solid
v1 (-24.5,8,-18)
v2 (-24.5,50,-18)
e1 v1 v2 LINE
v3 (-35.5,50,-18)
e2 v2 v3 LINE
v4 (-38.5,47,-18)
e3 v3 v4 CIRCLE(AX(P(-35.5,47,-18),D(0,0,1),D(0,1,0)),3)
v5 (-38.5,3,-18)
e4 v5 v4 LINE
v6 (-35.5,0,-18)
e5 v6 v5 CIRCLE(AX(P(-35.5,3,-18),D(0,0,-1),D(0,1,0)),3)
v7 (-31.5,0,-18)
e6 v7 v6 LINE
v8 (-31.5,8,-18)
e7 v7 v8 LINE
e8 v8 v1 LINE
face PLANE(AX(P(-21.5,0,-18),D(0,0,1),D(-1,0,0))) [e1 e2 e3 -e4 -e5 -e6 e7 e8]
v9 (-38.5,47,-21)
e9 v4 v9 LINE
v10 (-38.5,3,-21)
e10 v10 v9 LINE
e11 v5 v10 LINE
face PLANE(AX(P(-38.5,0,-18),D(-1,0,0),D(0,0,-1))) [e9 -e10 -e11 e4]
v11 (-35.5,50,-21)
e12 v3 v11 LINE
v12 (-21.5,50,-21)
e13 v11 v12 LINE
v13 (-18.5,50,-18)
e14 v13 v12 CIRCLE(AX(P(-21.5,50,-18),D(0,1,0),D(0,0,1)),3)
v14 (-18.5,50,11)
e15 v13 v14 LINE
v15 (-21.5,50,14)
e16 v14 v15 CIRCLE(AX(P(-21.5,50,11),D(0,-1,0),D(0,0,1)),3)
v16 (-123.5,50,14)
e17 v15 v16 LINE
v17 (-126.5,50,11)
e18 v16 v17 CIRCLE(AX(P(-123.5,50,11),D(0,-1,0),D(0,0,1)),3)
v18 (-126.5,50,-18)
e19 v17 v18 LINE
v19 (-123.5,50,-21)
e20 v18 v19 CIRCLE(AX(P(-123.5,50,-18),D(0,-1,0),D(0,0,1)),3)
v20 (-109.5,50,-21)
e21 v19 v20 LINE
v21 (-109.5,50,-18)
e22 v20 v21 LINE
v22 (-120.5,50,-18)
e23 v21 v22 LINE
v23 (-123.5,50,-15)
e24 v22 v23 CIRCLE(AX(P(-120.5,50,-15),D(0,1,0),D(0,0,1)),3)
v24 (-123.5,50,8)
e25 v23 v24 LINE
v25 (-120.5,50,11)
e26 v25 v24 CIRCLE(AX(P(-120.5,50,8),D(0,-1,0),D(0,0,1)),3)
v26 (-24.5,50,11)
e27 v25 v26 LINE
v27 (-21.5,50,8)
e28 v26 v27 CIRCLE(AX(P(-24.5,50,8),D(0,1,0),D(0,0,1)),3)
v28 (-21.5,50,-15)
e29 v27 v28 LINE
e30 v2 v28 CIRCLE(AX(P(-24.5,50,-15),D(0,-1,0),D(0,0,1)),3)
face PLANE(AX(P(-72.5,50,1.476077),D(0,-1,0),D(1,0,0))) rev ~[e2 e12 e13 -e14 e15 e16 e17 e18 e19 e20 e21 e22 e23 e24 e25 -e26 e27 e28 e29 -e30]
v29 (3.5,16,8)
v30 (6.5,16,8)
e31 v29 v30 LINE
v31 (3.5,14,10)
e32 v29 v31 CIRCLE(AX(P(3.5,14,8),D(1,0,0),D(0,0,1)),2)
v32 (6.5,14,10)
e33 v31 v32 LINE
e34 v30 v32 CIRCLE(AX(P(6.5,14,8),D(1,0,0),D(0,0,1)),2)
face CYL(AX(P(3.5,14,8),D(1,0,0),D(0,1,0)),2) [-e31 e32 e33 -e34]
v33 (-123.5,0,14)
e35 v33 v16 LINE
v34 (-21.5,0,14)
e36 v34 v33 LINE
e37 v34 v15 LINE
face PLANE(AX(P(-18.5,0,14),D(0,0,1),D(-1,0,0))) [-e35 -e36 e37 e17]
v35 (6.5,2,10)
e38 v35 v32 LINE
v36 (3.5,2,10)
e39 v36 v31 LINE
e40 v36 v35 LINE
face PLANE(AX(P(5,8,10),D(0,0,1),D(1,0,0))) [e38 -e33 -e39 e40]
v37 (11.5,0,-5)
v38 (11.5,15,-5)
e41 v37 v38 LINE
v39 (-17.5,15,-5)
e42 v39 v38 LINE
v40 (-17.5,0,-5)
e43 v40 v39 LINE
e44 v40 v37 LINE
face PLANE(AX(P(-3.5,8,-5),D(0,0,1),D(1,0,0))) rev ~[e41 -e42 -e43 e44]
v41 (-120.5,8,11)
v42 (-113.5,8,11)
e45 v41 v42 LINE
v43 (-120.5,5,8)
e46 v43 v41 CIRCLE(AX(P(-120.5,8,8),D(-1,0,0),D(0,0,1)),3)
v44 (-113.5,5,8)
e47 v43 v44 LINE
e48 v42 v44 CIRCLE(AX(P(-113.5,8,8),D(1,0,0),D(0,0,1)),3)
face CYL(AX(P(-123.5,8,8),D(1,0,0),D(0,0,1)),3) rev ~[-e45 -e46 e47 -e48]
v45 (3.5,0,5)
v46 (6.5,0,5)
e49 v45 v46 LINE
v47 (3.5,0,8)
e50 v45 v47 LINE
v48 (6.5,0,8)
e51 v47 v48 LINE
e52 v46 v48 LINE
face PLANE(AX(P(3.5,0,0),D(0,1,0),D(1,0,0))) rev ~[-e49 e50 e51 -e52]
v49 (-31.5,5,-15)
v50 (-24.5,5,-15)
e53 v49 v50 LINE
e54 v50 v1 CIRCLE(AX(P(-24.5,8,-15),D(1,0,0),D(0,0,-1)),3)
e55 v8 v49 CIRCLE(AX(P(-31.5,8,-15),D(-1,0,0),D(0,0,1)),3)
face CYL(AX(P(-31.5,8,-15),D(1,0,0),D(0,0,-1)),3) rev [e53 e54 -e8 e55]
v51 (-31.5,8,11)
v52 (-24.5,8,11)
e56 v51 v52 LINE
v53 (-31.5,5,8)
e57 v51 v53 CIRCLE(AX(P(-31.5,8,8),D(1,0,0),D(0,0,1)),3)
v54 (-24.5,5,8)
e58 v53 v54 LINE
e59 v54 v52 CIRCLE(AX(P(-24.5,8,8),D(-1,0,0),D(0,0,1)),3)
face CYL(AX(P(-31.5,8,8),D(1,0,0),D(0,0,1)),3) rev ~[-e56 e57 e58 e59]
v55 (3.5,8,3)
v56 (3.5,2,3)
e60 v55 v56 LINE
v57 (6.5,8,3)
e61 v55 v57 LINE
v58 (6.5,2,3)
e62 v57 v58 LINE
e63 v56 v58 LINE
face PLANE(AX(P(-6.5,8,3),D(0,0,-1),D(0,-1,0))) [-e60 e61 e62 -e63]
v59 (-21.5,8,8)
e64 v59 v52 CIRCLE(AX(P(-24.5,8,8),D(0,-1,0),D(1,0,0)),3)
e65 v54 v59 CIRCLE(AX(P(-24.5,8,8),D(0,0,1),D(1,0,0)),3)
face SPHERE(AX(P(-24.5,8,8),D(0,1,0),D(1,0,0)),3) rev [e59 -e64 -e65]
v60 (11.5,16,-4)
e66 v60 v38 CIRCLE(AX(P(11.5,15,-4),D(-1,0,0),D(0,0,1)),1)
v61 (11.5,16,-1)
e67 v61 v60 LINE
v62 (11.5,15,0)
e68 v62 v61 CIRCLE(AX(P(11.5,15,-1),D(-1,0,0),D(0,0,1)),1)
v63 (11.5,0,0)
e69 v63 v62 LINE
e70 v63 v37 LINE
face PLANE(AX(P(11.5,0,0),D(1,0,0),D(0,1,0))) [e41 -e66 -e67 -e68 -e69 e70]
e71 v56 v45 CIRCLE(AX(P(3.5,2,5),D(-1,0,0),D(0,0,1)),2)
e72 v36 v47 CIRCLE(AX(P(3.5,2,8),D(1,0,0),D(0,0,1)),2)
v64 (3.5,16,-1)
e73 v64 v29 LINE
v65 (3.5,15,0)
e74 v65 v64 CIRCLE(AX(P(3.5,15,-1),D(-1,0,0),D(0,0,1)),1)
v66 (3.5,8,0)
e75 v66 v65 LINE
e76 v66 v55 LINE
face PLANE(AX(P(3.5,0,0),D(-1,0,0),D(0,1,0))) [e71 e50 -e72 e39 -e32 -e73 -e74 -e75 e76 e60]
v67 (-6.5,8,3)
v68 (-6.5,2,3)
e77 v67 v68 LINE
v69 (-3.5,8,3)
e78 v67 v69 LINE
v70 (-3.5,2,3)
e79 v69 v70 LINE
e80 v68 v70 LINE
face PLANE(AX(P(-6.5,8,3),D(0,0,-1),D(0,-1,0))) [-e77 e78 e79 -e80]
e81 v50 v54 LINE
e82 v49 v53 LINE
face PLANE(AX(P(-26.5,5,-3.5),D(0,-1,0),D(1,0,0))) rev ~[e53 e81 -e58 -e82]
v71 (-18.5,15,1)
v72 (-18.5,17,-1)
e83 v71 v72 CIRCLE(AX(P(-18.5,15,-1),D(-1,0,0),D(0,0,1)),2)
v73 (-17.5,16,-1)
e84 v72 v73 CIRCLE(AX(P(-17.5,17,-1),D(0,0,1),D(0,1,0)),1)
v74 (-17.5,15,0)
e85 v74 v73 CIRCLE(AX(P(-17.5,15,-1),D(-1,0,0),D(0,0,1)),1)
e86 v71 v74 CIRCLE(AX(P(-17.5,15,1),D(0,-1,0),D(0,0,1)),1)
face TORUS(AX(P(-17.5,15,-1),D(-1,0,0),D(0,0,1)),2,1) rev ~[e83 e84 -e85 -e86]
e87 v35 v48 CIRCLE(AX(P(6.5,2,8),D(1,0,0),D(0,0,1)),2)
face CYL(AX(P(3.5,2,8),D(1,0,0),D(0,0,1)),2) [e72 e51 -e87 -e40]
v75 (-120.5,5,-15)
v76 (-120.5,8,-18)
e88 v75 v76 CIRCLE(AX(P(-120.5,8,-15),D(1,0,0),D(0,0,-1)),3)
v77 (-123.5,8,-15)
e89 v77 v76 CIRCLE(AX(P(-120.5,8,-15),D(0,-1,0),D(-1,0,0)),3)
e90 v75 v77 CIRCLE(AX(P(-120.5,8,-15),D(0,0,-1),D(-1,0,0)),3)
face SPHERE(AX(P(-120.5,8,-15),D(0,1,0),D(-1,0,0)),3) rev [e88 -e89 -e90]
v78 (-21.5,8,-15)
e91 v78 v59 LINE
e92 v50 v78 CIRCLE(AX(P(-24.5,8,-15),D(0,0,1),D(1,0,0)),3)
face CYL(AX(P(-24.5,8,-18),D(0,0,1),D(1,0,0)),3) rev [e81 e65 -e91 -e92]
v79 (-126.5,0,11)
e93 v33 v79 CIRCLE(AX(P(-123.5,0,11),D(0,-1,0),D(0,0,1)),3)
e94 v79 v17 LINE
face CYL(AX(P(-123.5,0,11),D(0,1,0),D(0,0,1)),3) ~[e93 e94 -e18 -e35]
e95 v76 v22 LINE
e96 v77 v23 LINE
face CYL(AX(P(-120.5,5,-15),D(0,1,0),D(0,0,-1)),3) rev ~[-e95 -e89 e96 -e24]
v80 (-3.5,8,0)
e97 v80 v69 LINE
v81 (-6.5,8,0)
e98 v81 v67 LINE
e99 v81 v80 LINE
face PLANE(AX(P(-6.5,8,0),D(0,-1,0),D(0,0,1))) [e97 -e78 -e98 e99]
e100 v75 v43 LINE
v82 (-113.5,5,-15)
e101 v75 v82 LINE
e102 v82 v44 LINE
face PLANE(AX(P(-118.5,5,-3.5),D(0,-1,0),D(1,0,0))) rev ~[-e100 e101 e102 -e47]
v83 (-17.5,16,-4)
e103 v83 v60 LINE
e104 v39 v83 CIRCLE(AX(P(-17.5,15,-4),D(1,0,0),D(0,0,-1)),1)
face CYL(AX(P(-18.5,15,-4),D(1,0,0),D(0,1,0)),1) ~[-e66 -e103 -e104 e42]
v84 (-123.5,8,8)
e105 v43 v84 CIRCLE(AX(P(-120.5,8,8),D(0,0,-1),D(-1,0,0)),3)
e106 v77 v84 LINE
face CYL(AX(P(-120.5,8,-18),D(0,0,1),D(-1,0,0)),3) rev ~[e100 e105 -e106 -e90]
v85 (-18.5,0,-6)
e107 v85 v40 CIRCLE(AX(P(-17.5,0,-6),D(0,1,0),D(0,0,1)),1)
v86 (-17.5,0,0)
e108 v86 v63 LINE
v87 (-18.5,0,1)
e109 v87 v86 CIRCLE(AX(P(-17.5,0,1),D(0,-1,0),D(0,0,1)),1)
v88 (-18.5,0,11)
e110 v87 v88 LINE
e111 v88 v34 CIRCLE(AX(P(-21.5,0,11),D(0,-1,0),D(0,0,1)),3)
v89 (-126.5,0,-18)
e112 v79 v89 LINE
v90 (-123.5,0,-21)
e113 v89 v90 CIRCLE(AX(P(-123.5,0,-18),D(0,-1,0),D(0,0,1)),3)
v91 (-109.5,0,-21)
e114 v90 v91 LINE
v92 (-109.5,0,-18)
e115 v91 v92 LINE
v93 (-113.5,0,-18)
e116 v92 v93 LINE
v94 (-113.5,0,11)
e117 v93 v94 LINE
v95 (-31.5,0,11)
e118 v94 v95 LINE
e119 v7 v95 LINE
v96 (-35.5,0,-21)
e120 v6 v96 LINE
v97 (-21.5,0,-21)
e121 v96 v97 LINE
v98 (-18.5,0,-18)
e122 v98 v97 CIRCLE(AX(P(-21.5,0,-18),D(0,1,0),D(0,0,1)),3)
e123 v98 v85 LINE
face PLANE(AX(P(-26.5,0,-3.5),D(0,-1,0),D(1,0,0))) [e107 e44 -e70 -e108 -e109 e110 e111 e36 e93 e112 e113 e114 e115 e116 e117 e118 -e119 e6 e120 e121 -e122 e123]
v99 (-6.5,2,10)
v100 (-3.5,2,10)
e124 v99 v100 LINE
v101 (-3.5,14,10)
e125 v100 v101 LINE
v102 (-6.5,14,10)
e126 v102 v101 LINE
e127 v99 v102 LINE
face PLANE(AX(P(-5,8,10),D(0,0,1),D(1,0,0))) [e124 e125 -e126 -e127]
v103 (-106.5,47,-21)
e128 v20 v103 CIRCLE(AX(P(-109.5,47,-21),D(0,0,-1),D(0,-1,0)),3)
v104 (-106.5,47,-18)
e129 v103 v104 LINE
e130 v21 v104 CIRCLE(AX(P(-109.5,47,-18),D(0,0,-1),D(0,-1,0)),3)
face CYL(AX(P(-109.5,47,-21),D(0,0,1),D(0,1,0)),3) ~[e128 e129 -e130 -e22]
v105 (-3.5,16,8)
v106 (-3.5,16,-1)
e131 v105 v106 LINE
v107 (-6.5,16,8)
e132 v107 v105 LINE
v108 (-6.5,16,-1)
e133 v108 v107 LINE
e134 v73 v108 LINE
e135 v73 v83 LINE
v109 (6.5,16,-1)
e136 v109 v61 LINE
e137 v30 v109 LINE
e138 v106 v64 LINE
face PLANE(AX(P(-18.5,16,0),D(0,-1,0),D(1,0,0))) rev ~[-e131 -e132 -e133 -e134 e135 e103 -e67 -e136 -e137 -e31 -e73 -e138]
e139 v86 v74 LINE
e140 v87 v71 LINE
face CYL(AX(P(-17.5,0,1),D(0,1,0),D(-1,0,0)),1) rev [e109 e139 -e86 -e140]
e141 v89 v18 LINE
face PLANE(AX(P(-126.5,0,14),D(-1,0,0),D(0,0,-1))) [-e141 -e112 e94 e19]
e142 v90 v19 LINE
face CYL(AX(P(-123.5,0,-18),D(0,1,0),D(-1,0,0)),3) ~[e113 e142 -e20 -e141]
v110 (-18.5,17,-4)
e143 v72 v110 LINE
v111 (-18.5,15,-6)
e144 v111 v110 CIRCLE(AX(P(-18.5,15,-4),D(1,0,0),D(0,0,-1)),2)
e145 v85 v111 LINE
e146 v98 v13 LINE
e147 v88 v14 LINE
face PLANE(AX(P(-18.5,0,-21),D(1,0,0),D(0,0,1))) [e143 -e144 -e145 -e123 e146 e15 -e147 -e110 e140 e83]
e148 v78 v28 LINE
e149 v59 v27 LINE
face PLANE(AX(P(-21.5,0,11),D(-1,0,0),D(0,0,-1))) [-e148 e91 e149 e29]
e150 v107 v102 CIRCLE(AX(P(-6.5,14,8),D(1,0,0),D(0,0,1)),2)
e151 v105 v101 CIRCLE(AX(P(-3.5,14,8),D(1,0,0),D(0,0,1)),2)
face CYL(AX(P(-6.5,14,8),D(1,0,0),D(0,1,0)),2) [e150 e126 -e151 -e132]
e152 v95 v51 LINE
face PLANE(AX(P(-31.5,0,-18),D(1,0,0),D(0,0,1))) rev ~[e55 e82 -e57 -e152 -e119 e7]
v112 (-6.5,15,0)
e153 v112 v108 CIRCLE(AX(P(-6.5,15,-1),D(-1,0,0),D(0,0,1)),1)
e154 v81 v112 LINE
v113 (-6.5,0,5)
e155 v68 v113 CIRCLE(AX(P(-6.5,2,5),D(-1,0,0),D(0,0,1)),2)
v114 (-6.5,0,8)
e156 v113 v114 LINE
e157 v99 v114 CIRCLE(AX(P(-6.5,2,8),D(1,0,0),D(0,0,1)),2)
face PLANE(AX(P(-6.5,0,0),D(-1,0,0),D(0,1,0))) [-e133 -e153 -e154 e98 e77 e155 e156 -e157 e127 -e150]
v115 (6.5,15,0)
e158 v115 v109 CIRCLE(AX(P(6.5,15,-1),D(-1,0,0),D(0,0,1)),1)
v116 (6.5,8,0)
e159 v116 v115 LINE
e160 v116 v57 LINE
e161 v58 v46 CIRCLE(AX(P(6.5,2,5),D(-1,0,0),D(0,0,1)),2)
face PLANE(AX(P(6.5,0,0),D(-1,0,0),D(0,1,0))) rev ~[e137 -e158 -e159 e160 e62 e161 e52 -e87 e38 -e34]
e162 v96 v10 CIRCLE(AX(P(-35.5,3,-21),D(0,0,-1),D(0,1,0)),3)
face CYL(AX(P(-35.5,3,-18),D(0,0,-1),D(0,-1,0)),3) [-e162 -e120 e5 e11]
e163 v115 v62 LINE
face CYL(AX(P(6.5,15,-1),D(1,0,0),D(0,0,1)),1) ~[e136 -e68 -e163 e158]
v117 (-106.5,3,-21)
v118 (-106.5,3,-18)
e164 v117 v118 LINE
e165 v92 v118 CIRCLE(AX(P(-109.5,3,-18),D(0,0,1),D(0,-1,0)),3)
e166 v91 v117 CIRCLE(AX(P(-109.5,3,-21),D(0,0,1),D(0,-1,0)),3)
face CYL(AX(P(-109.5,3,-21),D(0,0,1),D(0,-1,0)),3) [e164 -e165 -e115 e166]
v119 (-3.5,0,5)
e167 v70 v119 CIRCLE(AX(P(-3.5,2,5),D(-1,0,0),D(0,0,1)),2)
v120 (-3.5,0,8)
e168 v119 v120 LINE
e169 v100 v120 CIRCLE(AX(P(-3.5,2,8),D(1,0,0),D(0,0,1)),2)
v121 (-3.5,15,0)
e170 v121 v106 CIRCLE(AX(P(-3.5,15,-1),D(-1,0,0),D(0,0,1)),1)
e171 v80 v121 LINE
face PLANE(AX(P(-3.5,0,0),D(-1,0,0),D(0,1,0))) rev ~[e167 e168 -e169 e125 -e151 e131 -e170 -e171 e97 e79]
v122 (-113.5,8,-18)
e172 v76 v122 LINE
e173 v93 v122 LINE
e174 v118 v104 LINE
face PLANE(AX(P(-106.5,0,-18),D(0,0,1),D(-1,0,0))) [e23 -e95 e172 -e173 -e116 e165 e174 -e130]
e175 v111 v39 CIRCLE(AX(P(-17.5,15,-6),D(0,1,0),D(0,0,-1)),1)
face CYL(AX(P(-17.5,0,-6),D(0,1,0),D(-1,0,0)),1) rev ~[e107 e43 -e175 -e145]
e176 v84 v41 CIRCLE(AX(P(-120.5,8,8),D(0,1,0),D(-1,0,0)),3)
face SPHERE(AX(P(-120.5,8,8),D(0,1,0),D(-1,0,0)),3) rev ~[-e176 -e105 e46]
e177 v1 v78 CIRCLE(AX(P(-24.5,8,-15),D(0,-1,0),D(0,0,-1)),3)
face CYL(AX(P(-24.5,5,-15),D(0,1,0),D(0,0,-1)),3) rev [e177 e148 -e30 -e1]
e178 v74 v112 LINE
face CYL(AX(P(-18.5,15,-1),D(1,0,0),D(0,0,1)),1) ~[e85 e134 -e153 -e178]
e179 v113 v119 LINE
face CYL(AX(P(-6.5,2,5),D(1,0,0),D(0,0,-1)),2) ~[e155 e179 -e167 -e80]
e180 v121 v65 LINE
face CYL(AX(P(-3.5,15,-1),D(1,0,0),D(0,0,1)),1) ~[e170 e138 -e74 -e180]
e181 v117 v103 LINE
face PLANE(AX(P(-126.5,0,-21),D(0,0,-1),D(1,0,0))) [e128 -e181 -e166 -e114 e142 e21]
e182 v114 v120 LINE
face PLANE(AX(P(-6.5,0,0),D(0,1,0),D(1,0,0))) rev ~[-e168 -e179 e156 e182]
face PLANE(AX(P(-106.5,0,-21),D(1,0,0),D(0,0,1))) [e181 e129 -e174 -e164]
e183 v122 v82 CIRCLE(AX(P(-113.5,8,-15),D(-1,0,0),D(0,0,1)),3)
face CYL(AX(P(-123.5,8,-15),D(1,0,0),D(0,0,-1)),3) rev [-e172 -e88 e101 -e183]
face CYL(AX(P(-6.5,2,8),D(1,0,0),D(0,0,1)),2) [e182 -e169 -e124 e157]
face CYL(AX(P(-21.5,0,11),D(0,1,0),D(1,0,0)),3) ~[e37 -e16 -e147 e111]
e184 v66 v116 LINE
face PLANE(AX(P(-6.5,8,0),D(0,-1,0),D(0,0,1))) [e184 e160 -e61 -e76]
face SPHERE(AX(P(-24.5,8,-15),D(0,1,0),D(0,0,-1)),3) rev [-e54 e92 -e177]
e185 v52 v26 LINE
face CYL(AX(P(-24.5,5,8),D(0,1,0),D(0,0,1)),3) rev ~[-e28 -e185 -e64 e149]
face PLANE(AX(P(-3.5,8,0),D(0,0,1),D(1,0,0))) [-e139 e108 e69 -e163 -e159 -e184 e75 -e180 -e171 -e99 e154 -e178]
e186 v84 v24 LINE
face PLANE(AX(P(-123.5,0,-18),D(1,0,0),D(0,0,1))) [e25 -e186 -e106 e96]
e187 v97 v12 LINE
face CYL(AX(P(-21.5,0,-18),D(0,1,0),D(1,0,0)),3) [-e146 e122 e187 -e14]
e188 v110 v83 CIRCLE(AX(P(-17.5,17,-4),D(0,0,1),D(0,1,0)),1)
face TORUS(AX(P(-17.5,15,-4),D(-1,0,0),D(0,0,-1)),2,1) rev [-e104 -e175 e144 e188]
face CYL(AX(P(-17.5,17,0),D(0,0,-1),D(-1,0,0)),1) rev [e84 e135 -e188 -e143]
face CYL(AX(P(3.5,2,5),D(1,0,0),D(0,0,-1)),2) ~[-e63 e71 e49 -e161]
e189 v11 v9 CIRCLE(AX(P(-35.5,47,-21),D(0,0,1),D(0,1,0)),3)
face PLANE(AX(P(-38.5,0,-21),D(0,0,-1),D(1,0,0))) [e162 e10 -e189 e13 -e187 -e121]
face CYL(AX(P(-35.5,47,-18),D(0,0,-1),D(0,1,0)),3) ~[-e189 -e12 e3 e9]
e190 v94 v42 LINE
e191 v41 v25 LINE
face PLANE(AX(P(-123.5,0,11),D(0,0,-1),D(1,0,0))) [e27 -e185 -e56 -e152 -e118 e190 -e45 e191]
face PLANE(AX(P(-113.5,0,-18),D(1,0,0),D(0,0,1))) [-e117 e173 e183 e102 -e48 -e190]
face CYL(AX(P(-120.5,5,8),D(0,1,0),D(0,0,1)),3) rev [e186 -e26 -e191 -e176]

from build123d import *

# Parameters (mm, degrees)
F0_W     = 3
F0_H     = 16
F1_DEPTH = 10
F2_W     = 8
F2_H     = 3
F3_DEPTH = 25
F4_W     = 30
F4_H     = 16
F5_DEPTH = 5
F7_DEPTH = 50
F6_W     = 10
F6_H     = 29
F8_DEPTH = 5
F9_R     = 2
F10_R    = 3
F11_R    = 1


with BuildPart() as f1:
    # F0 (on Top) → F1 (new body)
    with BuildSketch(Plane.XY):
        with Locations((-5, 8)):
            Rectangle(F0_W, F0_H)
    extrude(amount=F1_DEPTH)


with BuildPart() as f1b:
    # F0 (on Top) → F1, piece 2 (new body)
    with BuildSketch(Plane.XY):
        with Locations((5, 8)):
            Rectangle(F0_W, F0_H)
    extrude(amount=F1_DEPTH)


with BuildPart() as f3_tool:
    # F2 (on face) → F3 (new body)
    with BuildSketch(Plane(origin=(-6.5, 0, 0), x_dir=(0, -1, 0), z_dir=(-1, 0, 0))):
        with Locations((-4, 1.5)):
            Rectangle(F2_W, F2_H)
    extrude(amount=-F3_DEPTH)


with BuildPart() as f1_1:
    add(f1.part)

    # F3: cut by f3_tool
    add(f3_tool.part, mode=Mode.SUBTRACT)



with BuildPart() as f1b_1:
    add(f1b.part)

    # F3: cut by f3_tool
    add(f3_tool.part, mode=Mode.SUBTRACT)


with BuildPart() as f1_2:
    add(f1_1.part)

    add(f1b_1.part)  # F5 merges F1b
    # F4 (on Top) → F5 (join)
    with BuildSketch(Plane.XY):
        with Locations((-3.5, 8)):
            Rectangle(F4_W, F4_H)
    extrude(amount=-F5_DEPTH)

    # F6 (on Front) → F7 (join)
    with BuildSketch(Plane.XZ):
        Polygon((-113.5, -18), (-123.5, -18), (-123.5, 11), (-113.5, 11), (-31.5, 11), (-21.5, 11), (-21.5, -18), (-31.5, -18), (-38.5, -18), (-38.5, -21), (-18.5, -21), (-18.5, 14), (-126.5, 14), (-126.5, -21), (-106.5, -21), (-106.5, -18), align=None)
    extrude(amount=-F7_DEPTH)

    # F6 (on Front) → F8 (join)
    with BuildSketch(Plane.XZ):
        with Locations((-26.5, -3.5)):
            Rectangle(F6_W, F6_H)
        with Locations((-118.5, -3.5)):
            Rectangle(F6_W, F6_H)
    extrude(amount=-F8_DEPTH)

    # F9
    f9_edges = [f1_2.edges().sort_by_distance(p)[0] for p in [
        (-5, 16, 10),
        (5, 16, 10),
        (-5, 0, 10),
        (5, 0, 10),
        (-5, 0, 3),
        (5, 0, 3),
    ]]
    fillet(f9_edges, radius=F9_R)

    # F10
    f10_edges = [f1_2.edges().sort_by_distance(p)[0] for p in [
        (-21.5, 27.5, 11),
        (-123.5, 27.5, 11),
        (-126.5, 25, 14),
        (-18.5, 25, 14),
        (-18.5, 25, -21),
        (-21.5, 27.5, -18),
        (-123.5, 27.5, -18),
        (-126.5, 25, -21),
        (-123.5, 5, -3.5),
        (-118.5, 5, -18),
        (-26.5, 5, -18),
        (-21.5, 5, -3.5),
        (-26.5, 5, 11),
        (-118.5, 5, 11),
        (-38.5, 0, -19.5),
        (-106.5, 0, -19.5),
        (-38.5, 50, -19.5),
        (-106.5, 50, -19.5),
    ]]
    fillet(f10_edges, radius=F10_R)

    # F11
    f11_edges = [f1_2.edges().sort_by_distance(p)[0] for p in [
        (-18.5, 16, -2.5),
        (-3.5, 16, -5),
        (-12.5, 16, 0),
        (0, 16, 0),
        (9, 16, 0),
        (-18.5, 8, -5),
        (-18.5, 8, 0),
    ]]
    fillet(f11_edges, radius=F11_R)


solid = f1_2.part
